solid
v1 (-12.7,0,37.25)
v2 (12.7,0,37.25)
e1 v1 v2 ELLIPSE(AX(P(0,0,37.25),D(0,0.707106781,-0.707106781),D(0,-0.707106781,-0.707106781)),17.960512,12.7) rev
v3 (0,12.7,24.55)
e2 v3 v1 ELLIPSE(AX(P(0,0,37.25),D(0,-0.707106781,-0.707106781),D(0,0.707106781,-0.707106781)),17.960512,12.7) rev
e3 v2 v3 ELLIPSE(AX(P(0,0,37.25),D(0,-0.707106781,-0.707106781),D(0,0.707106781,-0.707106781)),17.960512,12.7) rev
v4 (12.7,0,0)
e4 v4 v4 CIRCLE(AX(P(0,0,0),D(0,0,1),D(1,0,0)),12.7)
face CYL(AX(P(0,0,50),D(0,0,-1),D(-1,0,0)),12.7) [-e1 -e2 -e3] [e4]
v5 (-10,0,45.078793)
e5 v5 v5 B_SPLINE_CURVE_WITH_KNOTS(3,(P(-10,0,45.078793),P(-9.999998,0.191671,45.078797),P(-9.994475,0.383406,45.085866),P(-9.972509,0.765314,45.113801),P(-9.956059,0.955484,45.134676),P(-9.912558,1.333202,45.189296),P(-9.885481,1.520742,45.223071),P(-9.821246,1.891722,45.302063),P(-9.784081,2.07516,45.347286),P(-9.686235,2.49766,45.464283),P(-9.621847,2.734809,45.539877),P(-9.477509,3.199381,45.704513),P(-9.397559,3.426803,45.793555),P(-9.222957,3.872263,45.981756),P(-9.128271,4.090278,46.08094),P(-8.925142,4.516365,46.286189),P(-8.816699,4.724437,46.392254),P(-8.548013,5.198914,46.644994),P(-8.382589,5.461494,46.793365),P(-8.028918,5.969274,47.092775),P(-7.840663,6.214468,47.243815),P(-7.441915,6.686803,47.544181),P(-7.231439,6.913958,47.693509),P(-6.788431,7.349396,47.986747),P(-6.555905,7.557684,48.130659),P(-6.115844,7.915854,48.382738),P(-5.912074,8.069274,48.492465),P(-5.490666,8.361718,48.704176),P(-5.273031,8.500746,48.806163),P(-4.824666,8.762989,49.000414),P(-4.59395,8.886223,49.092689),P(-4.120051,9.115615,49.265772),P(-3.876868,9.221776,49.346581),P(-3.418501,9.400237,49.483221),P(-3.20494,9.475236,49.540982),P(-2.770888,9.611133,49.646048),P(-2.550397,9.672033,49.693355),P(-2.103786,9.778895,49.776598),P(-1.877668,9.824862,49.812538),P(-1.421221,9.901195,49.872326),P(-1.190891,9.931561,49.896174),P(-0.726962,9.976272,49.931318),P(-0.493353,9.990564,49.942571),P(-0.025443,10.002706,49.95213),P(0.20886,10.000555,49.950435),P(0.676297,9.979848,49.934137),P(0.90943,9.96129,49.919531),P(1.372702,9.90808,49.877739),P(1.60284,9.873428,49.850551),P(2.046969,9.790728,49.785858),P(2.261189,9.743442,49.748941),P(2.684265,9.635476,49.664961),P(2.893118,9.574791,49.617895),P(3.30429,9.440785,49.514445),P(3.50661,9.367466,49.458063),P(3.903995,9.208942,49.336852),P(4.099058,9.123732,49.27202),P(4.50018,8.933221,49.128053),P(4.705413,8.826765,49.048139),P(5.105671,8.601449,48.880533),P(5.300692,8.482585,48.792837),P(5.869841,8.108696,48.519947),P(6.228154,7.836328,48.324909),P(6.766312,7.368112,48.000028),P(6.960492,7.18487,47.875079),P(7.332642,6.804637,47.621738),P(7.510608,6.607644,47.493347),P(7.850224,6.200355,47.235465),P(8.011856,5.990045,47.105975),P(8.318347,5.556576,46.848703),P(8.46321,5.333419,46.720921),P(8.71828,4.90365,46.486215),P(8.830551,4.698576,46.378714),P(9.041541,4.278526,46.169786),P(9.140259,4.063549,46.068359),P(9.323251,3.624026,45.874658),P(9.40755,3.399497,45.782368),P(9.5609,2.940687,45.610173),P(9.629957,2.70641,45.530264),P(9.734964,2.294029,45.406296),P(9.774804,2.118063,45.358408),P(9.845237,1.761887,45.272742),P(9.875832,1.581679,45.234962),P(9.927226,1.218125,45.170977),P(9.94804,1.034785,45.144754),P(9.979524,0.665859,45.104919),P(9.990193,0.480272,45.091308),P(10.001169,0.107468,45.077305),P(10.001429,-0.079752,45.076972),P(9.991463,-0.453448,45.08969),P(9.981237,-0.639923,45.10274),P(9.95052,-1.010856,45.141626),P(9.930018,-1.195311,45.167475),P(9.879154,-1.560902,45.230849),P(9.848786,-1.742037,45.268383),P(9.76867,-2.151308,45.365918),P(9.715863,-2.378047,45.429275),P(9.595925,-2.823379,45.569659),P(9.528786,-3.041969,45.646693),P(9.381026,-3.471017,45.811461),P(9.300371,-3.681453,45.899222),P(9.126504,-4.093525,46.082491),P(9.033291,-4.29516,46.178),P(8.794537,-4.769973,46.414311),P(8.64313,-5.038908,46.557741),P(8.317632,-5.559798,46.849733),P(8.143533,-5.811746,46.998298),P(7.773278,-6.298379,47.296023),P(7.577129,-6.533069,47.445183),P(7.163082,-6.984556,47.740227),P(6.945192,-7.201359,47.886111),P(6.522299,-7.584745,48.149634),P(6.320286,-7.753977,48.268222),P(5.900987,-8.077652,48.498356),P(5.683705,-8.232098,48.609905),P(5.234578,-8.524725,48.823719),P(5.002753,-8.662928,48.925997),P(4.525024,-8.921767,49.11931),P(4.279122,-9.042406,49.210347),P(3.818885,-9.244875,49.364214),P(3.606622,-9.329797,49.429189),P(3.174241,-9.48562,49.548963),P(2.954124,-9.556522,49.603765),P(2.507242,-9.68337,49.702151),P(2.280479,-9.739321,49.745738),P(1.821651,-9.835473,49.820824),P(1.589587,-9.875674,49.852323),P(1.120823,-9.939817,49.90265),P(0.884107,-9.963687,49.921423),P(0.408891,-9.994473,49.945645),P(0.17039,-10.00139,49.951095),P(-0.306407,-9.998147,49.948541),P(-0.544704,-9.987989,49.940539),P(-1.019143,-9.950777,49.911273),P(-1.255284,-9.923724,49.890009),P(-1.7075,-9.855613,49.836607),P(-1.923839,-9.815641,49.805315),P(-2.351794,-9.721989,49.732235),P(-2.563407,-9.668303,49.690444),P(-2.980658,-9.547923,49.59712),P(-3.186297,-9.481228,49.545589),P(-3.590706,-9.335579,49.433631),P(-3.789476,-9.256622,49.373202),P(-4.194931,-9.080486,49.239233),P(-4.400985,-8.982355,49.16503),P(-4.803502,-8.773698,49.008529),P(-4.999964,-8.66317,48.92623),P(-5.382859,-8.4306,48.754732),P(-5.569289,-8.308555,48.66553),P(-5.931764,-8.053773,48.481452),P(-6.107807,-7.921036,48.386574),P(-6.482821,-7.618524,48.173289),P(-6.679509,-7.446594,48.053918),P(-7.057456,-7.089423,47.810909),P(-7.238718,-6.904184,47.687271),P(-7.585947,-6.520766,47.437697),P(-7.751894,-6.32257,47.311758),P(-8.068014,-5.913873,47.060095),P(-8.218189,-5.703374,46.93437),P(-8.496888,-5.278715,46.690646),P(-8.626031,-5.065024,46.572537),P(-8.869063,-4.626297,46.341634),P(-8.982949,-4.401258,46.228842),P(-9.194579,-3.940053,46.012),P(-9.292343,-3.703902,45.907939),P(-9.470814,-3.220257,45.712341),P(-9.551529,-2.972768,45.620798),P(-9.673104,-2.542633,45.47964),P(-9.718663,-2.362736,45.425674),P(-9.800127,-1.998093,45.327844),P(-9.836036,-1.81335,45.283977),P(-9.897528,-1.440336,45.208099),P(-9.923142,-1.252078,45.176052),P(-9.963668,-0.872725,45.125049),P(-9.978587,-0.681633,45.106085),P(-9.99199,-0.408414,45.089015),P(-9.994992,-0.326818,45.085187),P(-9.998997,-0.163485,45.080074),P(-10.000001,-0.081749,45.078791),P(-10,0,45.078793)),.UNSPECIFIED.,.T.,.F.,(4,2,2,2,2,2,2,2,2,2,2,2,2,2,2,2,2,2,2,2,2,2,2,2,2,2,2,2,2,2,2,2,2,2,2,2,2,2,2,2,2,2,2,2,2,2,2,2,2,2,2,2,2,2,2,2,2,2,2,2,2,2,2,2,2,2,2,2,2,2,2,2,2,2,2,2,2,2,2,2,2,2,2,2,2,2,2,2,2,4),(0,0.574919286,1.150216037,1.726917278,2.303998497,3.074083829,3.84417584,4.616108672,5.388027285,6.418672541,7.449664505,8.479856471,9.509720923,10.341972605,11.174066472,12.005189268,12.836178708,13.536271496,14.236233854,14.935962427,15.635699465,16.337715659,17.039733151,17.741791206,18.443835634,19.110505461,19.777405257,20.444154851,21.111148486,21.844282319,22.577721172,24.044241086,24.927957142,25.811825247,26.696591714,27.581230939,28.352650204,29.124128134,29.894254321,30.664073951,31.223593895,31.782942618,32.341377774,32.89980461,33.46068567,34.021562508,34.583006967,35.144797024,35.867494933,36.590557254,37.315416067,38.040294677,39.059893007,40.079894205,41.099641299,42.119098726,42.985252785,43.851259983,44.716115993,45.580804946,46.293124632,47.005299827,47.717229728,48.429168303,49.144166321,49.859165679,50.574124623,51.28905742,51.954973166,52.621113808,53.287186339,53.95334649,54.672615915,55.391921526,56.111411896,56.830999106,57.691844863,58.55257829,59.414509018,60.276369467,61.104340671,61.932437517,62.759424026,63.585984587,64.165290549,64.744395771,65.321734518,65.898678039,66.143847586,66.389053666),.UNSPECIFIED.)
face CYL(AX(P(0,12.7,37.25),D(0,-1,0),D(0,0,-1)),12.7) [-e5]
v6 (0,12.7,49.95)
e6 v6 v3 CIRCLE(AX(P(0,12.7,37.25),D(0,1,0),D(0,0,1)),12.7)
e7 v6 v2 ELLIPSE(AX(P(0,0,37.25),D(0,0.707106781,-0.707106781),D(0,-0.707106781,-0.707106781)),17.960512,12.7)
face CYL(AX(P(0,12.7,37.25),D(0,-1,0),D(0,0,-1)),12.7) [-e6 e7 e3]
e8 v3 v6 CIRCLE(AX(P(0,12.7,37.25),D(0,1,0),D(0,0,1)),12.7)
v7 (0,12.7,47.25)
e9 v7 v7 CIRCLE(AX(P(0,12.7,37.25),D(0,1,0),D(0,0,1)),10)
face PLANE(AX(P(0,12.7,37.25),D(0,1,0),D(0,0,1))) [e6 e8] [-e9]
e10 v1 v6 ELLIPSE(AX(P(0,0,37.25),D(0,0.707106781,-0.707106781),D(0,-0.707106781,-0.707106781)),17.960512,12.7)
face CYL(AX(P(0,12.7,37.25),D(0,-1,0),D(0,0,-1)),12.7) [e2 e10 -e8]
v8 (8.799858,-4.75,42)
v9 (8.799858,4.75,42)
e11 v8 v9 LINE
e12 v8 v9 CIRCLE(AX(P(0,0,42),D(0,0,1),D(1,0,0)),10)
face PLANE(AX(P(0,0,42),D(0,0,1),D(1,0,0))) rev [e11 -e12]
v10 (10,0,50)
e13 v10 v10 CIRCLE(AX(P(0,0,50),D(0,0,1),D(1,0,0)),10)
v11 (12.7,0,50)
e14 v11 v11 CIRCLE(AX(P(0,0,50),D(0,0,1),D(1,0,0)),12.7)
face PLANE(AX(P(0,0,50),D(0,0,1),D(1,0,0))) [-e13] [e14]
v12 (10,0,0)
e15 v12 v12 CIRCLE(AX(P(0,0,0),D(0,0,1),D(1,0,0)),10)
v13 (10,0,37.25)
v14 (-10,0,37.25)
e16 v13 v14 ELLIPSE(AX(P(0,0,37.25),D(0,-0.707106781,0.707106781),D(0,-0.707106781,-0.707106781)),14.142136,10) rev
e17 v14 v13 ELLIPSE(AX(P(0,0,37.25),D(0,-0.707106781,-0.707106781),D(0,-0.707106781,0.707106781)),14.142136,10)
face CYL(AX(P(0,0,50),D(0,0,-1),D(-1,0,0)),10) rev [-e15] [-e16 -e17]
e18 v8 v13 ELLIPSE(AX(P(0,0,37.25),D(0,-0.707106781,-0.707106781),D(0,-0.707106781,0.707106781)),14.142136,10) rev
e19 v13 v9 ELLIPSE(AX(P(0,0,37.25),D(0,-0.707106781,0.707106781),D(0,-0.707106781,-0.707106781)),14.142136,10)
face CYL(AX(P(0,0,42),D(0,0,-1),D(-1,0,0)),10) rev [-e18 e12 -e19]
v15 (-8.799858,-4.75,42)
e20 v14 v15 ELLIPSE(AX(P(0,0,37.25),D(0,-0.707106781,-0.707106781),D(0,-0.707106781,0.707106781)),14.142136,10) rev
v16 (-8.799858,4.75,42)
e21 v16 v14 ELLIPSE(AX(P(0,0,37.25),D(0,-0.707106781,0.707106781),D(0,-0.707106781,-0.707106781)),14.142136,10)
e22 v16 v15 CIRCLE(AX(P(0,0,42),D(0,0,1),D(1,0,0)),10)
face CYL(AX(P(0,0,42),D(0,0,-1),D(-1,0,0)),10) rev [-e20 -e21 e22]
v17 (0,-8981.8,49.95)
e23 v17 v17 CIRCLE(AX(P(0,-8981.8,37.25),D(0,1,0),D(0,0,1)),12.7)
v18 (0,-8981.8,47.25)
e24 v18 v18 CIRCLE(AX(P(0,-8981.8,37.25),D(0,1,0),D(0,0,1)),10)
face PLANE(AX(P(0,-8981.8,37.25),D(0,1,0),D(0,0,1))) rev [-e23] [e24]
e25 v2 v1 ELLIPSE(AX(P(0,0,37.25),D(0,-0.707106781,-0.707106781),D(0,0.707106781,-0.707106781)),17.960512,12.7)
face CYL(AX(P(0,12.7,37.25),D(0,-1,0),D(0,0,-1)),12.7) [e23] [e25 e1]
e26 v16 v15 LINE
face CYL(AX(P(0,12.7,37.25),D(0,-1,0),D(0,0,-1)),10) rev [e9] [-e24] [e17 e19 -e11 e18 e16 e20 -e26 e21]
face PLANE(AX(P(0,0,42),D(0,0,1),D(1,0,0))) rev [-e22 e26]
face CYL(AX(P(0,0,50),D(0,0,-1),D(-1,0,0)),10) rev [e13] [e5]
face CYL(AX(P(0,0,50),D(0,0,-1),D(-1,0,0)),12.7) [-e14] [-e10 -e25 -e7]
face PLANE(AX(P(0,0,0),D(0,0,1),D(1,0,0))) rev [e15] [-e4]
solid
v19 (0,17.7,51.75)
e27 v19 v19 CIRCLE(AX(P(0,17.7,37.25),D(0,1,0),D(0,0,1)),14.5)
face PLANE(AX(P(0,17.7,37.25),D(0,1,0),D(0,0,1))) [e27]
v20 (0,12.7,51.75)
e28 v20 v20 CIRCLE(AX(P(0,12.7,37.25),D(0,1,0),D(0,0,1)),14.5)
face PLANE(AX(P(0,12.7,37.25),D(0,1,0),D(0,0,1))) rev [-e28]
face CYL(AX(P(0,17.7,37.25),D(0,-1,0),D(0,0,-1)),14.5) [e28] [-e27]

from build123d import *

# Parameters (mm, degrees)
CROQUIS1_R                 = 12.7
CROQUIS1_R_2               = 10
SALIENTE_EXTRUIR1_DEPTH    = 50
SALIENTE_EXTRUIR2_START    = -8969.1
SALIENTE_EXTRUIR2_DEPTH    = 8994.5
CORTAR_EXTRUIR1_DEPTH      = 8970.248357687
CORTAR_EXTRUIR1_DEPTH_BACK = 8970.248357687
CROQUIS3_R                 = 10
CROQUIS4_R                 = 10
CORTAR_EXTRUIR2_DEPTH      = 42
CROQUIS5_R                 = 14.5
SALIENTE_EXTRUIR4_DEPTH    = 5


# Read off the part's stored shape, not the designer's step: Saliente-Extruir2
with BuildPart() as part:
    # Croquis1 → Saliente-Extruir1 (new body)
    with BuildSketch(Plane.XY):
        Circle(CROQUIS1_R)
        Circle(CROQUIS1_R_2, mode=Mode.SUBTRACT)
    extrude(amount=SALIENTE_EXTRUIR1_DEPTH)

    # Saliente-Extruir2 outline → Saliente-Extruir2 (add)
    with BuildSketch(Plane(origin=(0, -12.7, 0), x_dir=(1, 0, 0), z_dir=(0, 1, 0)).offset(SALIENTE_EXTRUIR2_START)):
        with BuildLine():
            ThreePointArc((-10.00000081, -45.078791975), (0.000421906, -49.949999993), (10.000520948, -45.07812754))
            ThreePointArc((10.000520948, -45.07812754), (-0.000421906, -24.550000007), (-10.00000081, -45.078791975))
        make_face()
    extrude(amount=SALIENTE_EXTRUIR2_DEPTH)

    # Croquis3 → Cortar-Extruir1 (cut, two sides: drawn at the far end of the back side and taken through both)
    with BuildSketch(Plane(origin=(0, -12.7, 0), x_dir=(1, 0, 0), z_dir=(0, 1, 0)).offset(-CORTAR_EXTRUIR1_DEPTH_BACK)):
        with Locations(Location((0, -37.25, 0), (0, 0, 270))):
            Circle(CROQUIS3_R)
    extrude(amount=CORTAR_EXTRUIR1_DEPTH + CORTAR_EXTRUIR1_DEPTH_BACK, mode=Mode.SUBTRACT)

    # Croquis4 → Cortar-Extruir2 (cut)
    with BuildSketch(Plane.XY):
        with Locations(Location((0, 0, 0), (0, 0, 180))):
            Circle(CROQUIS4_R)
    extrude(amount=CORTAR_EXTRUIR2_DEPTH, mode=Mode.SUBTRACT)


with BuildPart() as body_2:
    # Croquis5 → Saliente-Extruir4 (new body)
    with BuildSketch(Plane(origin=(0, 12.7, 0), x_dir=(1, 0, 0), z_dir=(0, 1, 0))):
        with Locations(Location((0, -37.25, 0), (0, 0, 270))):
            Circle(CROQUIS5_R)
    extrude(amount=SALIENTE_EXTRUIR4_DEPTH)


solid = Compound([part.part, body_2.part])
